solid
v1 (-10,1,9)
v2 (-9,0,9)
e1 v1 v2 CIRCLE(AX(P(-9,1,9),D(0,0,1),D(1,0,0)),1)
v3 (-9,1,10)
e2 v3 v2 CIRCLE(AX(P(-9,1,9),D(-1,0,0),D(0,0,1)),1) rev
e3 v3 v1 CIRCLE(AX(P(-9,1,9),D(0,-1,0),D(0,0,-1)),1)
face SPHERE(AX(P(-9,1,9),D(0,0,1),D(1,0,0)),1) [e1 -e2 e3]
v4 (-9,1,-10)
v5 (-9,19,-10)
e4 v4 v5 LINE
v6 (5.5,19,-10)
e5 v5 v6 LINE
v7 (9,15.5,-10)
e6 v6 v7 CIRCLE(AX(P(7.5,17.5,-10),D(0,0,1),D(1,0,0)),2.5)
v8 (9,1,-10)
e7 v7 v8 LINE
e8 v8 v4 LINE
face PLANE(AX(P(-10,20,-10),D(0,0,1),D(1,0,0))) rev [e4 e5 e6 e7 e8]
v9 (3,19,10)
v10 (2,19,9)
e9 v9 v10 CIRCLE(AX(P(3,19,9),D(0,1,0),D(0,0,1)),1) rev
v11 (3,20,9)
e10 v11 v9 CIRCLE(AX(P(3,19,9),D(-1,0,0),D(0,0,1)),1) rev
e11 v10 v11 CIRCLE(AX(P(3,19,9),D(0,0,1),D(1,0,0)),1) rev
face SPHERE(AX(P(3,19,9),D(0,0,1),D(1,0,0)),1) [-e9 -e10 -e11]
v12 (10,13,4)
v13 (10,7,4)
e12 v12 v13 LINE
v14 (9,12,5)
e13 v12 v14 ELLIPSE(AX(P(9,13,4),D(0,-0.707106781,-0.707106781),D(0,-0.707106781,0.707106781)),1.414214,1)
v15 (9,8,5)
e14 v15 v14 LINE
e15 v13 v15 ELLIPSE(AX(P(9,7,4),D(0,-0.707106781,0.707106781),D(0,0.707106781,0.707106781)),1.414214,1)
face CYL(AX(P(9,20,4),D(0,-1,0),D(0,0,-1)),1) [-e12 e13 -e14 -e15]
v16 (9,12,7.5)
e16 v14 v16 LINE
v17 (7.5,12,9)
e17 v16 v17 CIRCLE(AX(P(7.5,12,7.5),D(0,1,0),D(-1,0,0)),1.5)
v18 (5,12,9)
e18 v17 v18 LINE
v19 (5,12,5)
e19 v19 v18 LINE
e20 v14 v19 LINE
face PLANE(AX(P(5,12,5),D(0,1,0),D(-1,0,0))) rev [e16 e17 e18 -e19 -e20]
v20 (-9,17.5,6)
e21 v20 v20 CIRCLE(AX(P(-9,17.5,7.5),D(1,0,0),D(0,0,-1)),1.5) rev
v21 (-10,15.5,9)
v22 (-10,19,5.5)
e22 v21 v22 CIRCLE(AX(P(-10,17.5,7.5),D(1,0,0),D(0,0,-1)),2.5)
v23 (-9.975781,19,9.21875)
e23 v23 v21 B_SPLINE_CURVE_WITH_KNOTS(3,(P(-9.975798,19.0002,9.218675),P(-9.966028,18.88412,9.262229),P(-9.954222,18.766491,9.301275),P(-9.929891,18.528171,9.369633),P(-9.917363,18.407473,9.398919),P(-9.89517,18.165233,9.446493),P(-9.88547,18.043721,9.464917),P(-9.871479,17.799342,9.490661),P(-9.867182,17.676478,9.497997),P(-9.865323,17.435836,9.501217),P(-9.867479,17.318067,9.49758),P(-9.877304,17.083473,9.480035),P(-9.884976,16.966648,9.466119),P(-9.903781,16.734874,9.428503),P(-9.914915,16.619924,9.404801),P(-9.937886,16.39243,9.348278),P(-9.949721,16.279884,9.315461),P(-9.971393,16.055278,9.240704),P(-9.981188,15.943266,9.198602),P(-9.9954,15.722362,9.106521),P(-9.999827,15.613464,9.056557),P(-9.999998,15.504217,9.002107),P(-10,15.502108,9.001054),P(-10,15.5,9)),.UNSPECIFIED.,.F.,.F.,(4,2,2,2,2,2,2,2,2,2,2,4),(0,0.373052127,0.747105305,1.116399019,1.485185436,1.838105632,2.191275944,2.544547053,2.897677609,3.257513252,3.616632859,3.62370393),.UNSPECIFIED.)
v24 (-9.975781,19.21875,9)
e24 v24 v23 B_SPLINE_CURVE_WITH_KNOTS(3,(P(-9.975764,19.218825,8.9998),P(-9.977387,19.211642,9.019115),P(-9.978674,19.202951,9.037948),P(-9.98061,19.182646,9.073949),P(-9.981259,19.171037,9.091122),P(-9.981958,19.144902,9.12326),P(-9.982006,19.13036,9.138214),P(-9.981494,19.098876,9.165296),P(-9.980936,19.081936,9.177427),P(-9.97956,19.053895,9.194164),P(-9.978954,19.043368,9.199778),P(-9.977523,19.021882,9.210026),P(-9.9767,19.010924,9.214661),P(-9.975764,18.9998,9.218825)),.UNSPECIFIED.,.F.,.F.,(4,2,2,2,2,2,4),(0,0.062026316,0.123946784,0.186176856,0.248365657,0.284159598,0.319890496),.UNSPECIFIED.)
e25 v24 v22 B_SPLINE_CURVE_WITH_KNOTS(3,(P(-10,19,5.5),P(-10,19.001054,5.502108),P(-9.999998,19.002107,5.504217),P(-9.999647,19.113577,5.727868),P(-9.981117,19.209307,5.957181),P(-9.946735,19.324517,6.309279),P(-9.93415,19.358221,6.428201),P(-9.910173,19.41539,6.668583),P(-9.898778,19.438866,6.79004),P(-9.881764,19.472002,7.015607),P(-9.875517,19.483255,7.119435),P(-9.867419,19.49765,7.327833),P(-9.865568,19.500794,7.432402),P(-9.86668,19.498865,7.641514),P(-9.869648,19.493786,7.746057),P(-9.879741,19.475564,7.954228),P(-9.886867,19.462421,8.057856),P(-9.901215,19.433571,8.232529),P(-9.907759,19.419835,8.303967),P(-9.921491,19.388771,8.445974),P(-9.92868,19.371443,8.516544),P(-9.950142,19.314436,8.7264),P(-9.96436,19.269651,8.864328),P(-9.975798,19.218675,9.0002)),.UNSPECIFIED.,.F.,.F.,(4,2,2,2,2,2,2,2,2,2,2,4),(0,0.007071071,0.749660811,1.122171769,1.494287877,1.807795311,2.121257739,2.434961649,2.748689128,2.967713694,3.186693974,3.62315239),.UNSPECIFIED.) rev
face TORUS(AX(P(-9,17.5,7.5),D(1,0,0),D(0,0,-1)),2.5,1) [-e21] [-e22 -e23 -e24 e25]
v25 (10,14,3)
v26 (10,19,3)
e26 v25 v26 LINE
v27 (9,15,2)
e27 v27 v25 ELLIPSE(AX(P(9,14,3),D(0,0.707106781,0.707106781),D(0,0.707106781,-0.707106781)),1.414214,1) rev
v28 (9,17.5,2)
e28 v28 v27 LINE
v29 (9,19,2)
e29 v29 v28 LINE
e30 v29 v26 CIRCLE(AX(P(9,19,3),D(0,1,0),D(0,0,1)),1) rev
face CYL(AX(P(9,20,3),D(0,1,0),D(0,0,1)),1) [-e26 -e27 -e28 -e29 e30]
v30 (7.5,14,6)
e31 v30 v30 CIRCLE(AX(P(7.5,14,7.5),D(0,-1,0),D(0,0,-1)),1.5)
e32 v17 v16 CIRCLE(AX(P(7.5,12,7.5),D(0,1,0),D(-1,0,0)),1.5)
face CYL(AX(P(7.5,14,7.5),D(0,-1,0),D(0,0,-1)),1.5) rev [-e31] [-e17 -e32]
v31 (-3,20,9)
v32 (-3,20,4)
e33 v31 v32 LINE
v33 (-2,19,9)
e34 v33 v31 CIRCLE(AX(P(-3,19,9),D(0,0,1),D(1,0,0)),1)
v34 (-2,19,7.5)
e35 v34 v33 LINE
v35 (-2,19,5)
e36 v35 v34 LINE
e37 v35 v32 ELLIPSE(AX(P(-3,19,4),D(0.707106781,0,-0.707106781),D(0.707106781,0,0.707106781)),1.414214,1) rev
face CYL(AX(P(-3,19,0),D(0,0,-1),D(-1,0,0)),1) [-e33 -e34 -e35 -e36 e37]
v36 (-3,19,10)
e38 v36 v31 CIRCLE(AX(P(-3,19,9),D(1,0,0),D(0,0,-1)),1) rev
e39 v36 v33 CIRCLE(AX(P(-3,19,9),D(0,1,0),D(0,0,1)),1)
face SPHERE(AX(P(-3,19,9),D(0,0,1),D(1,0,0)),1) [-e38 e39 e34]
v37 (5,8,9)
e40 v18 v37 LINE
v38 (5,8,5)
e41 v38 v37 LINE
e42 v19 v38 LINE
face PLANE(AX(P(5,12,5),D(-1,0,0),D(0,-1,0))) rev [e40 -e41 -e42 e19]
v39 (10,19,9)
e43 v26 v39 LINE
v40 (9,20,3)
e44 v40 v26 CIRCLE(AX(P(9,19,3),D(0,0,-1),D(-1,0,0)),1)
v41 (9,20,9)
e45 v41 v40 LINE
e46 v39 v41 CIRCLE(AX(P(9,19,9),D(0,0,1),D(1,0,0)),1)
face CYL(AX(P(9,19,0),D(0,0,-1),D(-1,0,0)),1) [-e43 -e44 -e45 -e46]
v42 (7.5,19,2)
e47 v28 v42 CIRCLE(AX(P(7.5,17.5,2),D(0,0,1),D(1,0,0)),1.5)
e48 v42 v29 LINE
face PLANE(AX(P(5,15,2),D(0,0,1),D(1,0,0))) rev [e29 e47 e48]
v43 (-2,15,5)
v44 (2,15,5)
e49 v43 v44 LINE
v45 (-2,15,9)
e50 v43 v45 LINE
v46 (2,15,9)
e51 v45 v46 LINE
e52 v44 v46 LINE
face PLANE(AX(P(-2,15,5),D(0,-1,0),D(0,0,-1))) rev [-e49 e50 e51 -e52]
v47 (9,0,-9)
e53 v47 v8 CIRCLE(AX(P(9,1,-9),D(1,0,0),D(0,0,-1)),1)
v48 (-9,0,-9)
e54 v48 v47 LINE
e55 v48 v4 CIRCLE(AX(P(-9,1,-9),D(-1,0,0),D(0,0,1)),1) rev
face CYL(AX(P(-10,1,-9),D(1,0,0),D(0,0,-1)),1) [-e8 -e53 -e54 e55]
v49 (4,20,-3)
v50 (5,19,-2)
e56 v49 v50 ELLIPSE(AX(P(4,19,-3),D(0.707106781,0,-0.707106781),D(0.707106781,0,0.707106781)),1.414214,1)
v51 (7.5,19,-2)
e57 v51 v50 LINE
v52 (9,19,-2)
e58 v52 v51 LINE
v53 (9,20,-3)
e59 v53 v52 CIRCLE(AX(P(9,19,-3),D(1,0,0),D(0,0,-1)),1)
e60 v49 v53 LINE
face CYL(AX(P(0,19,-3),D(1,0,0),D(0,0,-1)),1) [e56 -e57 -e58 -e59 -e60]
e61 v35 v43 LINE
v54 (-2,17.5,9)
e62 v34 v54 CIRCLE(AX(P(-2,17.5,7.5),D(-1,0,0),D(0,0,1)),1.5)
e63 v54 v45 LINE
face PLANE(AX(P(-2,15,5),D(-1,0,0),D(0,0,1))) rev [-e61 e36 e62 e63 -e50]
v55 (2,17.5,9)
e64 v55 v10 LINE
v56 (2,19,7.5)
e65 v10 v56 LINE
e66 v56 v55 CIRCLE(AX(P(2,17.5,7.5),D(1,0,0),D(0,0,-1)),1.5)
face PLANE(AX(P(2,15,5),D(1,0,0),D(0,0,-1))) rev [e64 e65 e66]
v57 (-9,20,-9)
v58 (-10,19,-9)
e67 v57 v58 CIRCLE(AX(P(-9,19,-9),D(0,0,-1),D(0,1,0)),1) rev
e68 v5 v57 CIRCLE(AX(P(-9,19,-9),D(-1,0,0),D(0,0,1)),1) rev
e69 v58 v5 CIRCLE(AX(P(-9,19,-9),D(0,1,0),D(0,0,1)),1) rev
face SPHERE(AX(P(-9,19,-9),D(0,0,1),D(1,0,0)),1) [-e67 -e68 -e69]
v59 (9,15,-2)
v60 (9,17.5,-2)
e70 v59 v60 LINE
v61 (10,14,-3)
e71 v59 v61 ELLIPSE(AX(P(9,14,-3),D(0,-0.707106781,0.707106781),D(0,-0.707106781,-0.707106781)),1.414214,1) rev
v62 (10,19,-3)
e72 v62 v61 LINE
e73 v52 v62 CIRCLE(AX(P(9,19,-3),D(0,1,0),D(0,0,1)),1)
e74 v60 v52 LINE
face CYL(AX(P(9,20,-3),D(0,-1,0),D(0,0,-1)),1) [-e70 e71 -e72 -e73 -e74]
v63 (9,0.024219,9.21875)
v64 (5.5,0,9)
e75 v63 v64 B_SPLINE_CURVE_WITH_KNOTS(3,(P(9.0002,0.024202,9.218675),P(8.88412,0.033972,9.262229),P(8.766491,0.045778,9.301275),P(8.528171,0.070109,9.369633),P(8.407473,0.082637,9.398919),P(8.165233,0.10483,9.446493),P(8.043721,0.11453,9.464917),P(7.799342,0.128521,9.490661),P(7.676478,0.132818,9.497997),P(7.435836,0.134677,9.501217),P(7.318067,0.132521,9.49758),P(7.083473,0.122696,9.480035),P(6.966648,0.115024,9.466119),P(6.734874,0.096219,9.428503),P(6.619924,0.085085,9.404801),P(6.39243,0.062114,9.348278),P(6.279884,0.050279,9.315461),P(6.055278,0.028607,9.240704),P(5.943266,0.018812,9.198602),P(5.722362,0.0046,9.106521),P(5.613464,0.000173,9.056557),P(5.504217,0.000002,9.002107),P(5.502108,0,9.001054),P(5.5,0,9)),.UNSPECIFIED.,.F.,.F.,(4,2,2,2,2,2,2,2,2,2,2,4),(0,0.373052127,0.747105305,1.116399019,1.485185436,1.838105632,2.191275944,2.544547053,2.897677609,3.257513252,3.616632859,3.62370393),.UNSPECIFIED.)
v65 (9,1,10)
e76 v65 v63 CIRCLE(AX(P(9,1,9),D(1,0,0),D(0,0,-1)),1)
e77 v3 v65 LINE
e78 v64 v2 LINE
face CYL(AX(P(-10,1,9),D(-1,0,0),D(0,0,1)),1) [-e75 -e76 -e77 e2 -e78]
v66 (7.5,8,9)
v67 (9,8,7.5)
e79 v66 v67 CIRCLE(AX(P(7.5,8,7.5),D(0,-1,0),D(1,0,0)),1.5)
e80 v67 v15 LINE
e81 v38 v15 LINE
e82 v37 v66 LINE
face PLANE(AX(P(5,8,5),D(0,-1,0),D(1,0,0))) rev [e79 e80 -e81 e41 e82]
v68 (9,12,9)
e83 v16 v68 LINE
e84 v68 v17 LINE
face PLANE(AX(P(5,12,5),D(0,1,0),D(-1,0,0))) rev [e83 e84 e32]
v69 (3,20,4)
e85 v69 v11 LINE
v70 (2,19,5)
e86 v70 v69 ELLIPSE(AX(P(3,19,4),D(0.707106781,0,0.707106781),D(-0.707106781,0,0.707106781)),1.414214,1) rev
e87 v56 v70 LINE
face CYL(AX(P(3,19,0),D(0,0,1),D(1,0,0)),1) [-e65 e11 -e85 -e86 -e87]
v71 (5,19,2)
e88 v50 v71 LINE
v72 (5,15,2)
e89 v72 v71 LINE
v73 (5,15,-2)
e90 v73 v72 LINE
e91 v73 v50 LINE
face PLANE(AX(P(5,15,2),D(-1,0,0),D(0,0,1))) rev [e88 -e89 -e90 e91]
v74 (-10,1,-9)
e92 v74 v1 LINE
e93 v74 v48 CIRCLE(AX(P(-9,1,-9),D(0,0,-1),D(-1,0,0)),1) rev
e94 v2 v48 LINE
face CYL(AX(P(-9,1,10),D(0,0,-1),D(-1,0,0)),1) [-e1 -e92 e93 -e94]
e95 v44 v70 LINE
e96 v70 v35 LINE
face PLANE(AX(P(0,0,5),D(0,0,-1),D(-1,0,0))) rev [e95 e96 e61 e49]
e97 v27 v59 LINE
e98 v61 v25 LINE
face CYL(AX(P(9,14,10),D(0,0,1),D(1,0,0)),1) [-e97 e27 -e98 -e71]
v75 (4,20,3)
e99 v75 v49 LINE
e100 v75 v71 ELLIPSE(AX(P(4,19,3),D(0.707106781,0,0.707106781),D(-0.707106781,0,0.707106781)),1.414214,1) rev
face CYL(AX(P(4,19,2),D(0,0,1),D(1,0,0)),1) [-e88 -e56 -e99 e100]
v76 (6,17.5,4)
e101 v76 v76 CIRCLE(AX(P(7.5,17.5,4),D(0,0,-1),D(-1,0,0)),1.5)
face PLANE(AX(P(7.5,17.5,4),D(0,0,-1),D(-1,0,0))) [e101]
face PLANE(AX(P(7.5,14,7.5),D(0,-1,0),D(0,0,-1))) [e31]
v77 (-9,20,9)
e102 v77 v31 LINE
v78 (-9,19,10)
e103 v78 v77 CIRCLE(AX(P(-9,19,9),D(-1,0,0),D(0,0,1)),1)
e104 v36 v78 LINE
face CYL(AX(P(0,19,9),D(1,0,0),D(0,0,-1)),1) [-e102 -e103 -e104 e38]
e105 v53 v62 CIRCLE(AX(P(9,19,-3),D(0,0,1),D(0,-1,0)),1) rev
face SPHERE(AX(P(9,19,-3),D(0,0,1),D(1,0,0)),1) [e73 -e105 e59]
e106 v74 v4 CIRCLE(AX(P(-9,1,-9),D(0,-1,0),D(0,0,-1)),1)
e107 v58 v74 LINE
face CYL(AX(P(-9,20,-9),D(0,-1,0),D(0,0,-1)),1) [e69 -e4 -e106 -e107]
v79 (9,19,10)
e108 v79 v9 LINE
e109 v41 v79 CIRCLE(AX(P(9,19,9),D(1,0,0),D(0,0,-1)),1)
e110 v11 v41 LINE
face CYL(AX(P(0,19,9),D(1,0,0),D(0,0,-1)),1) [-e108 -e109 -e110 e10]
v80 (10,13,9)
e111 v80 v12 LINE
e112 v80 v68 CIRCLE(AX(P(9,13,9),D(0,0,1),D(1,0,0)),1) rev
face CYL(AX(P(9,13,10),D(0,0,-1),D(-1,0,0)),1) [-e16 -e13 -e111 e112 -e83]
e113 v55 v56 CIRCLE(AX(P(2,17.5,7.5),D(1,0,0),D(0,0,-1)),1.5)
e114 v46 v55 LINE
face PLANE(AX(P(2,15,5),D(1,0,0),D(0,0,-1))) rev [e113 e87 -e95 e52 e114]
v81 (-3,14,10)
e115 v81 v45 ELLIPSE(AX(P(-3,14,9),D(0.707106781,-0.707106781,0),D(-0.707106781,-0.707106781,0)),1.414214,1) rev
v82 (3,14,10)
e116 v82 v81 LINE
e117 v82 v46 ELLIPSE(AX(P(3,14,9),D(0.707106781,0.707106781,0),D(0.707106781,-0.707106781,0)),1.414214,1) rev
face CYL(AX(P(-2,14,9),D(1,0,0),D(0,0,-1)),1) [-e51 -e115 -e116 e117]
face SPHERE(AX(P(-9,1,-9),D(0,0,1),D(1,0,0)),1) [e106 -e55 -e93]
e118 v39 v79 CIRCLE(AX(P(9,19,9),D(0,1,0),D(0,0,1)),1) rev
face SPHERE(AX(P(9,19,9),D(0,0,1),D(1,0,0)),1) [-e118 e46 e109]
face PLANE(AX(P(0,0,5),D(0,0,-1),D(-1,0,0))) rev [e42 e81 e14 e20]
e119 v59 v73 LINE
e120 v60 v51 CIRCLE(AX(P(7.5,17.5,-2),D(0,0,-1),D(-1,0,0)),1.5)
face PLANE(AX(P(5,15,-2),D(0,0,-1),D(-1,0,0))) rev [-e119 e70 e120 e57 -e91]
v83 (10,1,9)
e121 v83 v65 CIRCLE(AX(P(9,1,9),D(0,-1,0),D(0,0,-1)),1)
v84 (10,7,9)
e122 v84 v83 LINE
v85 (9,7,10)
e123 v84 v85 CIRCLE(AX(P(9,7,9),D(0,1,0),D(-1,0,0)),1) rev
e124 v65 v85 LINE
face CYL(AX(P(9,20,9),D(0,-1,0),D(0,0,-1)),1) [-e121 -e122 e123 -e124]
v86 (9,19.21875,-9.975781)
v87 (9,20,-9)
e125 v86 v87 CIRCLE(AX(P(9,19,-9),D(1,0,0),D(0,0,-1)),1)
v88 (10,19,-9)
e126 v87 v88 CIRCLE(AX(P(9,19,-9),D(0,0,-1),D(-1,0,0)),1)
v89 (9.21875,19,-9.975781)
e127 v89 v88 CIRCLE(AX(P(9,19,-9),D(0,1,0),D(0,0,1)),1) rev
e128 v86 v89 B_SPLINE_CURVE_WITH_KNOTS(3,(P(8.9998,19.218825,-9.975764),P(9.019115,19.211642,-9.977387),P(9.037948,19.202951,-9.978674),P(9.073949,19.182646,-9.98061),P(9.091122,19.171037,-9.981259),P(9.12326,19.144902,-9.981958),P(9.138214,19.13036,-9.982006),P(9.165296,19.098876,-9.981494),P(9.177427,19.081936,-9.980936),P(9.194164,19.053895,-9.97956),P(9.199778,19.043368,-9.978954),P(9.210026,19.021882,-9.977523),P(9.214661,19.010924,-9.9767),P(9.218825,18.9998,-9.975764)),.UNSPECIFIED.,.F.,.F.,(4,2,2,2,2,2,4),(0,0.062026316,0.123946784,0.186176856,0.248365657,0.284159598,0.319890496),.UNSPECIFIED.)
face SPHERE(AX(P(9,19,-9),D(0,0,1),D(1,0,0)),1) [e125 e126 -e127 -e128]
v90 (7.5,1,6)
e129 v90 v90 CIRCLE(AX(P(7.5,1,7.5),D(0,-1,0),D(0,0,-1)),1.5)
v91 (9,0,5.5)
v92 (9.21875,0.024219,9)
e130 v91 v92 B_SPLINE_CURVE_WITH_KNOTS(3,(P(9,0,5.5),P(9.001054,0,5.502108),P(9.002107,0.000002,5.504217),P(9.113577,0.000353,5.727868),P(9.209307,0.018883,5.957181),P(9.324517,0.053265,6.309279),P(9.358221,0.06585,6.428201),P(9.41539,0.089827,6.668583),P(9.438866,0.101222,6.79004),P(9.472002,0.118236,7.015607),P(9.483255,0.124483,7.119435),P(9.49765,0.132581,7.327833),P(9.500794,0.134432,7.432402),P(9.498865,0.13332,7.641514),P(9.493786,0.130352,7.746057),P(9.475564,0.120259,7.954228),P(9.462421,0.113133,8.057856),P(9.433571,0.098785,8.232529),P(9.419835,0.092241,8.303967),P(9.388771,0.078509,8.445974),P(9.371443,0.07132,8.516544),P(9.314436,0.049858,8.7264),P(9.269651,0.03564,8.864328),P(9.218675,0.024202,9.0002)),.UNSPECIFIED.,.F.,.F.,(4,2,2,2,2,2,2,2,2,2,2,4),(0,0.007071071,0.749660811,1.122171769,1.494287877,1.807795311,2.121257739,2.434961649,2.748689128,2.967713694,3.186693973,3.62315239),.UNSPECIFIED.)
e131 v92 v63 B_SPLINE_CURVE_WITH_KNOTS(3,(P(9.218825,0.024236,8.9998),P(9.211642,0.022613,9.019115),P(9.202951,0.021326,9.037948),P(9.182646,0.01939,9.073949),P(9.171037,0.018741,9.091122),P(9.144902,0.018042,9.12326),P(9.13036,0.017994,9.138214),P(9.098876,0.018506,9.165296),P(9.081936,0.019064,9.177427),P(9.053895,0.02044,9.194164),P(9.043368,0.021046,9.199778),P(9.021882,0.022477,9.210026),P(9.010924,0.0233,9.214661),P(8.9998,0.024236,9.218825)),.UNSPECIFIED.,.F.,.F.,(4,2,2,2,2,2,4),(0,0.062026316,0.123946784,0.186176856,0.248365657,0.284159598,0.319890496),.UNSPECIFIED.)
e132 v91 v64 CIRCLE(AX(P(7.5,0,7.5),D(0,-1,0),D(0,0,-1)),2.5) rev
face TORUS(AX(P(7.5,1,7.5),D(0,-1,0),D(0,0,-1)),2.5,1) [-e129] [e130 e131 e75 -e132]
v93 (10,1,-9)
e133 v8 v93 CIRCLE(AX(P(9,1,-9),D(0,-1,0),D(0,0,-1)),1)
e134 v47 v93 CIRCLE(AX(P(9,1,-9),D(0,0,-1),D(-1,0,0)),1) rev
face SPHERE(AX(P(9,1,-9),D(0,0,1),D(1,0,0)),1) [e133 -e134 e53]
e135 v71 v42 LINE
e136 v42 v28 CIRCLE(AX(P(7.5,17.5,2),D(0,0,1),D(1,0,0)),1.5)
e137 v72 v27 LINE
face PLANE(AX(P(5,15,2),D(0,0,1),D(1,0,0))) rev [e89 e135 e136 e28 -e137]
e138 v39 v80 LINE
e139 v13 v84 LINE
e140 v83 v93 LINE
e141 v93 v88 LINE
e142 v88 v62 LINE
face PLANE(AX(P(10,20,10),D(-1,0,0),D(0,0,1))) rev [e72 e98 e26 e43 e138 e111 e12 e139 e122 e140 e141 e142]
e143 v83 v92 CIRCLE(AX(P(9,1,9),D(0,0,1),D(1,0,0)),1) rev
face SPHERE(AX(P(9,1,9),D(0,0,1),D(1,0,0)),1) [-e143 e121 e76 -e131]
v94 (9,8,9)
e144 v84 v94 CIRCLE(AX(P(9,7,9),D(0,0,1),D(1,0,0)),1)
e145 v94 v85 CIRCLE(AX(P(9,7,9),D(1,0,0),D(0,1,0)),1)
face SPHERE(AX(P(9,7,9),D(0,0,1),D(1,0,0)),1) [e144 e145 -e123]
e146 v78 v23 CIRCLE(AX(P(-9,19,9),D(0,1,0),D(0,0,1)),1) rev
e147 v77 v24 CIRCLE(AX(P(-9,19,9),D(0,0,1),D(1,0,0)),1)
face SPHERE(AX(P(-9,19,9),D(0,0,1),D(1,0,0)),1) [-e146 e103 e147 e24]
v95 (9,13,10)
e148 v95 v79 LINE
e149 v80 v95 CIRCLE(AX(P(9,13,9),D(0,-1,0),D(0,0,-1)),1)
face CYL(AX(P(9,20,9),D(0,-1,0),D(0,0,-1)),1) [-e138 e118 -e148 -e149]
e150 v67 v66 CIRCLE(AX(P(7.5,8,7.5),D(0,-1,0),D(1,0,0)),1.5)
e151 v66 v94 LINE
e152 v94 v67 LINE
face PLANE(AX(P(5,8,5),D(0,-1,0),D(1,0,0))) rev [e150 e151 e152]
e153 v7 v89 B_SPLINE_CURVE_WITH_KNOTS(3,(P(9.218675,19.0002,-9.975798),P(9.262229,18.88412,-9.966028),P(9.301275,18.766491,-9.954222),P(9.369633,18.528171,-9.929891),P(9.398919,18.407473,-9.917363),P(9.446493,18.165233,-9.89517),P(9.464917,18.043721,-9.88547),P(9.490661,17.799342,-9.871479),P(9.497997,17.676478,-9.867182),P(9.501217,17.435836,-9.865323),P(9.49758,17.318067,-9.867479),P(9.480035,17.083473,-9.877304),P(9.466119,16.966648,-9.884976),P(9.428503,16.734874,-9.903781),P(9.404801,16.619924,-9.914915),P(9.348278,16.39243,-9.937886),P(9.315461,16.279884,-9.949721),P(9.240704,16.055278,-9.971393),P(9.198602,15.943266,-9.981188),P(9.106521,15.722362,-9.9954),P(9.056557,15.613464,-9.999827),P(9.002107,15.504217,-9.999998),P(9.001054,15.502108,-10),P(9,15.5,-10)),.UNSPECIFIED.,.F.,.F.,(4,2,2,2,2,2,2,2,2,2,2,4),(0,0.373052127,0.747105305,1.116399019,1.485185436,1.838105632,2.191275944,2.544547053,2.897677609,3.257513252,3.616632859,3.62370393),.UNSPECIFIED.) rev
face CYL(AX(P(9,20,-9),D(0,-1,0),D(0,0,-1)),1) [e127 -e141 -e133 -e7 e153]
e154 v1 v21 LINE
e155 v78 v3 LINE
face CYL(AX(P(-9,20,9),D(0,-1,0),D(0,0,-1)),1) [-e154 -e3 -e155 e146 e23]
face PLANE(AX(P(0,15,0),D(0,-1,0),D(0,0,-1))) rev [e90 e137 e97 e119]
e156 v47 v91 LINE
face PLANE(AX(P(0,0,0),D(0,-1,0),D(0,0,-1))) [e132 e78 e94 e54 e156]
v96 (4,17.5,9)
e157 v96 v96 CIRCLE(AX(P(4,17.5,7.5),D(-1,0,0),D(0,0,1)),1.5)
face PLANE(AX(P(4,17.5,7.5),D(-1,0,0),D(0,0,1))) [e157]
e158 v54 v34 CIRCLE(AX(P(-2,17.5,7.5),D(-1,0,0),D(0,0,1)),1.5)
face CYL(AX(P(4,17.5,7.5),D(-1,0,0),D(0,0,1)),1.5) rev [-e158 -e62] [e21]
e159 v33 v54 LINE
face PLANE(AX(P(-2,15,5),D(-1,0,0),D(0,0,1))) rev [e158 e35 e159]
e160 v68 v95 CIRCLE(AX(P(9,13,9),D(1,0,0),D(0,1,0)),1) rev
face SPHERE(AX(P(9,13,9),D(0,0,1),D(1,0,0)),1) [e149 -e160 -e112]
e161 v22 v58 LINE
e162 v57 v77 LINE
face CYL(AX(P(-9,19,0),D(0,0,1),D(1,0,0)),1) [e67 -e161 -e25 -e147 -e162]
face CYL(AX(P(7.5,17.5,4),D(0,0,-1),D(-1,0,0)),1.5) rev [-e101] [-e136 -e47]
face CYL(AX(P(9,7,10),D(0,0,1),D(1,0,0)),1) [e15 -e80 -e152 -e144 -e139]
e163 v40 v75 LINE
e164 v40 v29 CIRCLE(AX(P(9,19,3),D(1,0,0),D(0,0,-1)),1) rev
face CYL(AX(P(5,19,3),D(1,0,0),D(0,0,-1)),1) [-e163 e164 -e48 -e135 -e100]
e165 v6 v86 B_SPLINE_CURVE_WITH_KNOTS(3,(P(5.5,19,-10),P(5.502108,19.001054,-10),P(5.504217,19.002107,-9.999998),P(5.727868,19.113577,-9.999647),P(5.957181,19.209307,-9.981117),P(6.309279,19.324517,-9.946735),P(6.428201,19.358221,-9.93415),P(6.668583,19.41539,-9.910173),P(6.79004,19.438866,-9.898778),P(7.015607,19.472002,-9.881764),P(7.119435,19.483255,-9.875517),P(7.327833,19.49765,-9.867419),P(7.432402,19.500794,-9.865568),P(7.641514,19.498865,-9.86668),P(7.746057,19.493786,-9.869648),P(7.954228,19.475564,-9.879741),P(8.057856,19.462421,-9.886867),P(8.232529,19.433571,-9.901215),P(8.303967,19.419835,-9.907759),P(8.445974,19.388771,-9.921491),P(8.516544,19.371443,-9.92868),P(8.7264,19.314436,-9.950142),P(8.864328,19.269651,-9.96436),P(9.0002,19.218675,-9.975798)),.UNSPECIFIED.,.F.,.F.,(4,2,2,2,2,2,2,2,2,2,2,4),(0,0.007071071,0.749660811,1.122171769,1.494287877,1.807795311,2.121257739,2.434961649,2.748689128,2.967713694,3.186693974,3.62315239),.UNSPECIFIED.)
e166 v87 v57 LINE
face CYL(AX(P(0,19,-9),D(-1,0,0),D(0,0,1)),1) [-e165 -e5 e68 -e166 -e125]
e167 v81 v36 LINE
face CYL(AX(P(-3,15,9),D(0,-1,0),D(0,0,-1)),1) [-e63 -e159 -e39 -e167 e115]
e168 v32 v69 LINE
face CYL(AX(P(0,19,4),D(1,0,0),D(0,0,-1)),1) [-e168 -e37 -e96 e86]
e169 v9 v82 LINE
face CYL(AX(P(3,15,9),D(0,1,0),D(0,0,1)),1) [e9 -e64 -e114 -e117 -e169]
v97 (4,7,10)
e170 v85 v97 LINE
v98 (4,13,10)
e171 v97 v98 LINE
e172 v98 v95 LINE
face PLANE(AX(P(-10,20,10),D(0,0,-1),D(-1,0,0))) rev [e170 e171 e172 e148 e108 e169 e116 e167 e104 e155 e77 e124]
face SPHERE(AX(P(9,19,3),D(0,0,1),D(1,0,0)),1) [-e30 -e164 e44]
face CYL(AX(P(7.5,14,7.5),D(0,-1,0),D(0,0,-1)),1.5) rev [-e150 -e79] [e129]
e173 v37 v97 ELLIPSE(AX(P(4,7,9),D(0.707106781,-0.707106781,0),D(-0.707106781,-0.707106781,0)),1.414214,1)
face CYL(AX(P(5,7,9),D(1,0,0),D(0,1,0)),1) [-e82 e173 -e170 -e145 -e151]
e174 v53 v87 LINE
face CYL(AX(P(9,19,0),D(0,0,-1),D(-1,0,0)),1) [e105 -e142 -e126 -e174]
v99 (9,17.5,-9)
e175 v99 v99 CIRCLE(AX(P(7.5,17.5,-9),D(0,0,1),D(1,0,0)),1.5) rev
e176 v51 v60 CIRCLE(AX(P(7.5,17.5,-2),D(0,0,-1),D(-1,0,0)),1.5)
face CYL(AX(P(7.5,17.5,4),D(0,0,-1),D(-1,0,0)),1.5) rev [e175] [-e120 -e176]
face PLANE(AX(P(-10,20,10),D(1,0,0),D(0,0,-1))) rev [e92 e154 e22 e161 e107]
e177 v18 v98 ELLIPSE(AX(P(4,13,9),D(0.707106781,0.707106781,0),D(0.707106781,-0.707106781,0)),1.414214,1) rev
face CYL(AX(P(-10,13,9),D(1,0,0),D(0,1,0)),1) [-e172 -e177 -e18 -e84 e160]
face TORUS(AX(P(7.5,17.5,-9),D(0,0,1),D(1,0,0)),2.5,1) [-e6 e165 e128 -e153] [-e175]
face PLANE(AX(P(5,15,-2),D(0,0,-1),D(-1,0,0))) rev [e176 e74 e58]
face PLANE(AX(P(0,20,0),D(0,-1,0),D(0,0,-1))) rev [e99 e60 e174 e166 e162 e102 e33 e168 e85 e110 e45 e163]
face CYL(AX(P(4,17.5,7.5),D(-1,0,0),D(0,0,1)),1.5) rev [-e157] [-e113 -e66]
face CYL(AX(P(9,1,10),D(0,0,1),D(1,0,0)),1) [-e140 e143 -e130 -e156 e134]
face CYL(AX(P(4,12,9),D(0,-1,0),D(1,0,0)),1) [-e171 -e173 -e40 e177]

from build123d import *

# Parameters (mm, degrees)
SKETCH1_W           = 20
SKETCH1_H           = 20
BOSS_EXTRUDE1_DEPTH = 20
SKETCH2_W           = 4
SKETCH2_H           = 10
SKETCH2_W_2         = 10
SKETCH2_H_2         = 4
CUT_EXTRUDE1_DEPTH  = 5
SKETCH3_W           = 10
SKETCH3_H           = 4
CUT_EXTRUDE2_DEPTH  = 5
SKETCH4_R           = 1.5
CUT_EXTRUDE3_DEPTH  = 14
SKETCH5_R           = 1.5
CUT_EXTRUDE4_DEPTH  = 14
SKETCH6_R           = 1.5
CUT_EXTRUDE5_DEPTH  = 14
FILLET4_R           = 1


with BuildPart() as part:
    # Sketch1 → Boss-Extrude1 (new body)
    with BuildSketch(Plane(origin=(0, 0, 0), x_dir=(1, 0, 0), z_dir=(0, 1, 0))):
        Rectangle(SKETCH1_W, SKETCH1_H)
    extrude(amount=BOSS_EXTRUDE1_DEPTH)

    # Sketch2 → Cut-Extrude1 (cut)
    with BuildSketch(Plane.XY.offset(10)):
        with Locations((0, 20)):
            Rectangle(SKETCH2_W, SKETCH2_H)
        with Locations((10, 10)):
            Rectangle(SKETCH2_W_2, SKETCH2_H_2)
    extrude(amount=-CUT_EXTRUDE1_DEPTH, mode=Mode.SUBTRACT)

    # Sketch3 → Cut-Extrude2 (cut)
    with BuildSketch(Plane(origin=(0, 20, 0), x_dir=(1, 0, 0), z_dir=(0, 1, 0))):
        with Locations((10, 0)):
            Rectangle(SKETCH3_W, SKETCH3_H)
    extrude(amount=-CUT_EXTRUDE2_DEPTH, mode=Mode.SUBTRACT)

    # Sketch4 → Cut-Extrude3 (cut)
    with BuildSketch(Plane.ZY.offset(10)):
        with Locations((7.5, 17.5)):
            Circle(SKETCH4_R)
    extrude(amount=-CUT_EXTRUDE3_DEPTH, mode=Mode.SUBTRACT)

    # Sketch5 → Cut-Extrude4 (cut)
    with BuildSketch(Plane(origin=(0, 0, -10), x_dir=(-1, 0, 0), z_dir=(0, 0, -1))):
        with Locations((-7.5, 17.5)):
            Circle(SKETCH5_R)
    extrude(amount=-CUT_EXTRUDE4_DEPTH, mode=Mode.SUBTRACT)

    # Sketch6 → Cut-Extrude5 (cut)
    with BuildSketch(Plane.XZ):
        with Locations(Location((7.5, 7.5, 0), (0, 0, 270))):
            Circle(SKETCH6_R)
    extrude(amount=-CUT_EXTRUDE5_DEPTH, mode=Mode.SUBTRACT)

    # Fillet4
    # the kernel refuses this fillet: 1 mm, written as the material it takes off along each edge
    with BuildSketch(Plane(origin=(-9, 19, -9), x_dir=(0, 0, -1), z_dir=(-1, 0, 0))) as fillet4_piece_1_section:
        Polygon((0, 0), (FILLET4_R, 0), (FILLET4_R, -FILLET4_R), (0, -FILLET4_R), align=None)
    fillet4_piece_1 = extrude(amount=FILLET4_R, mode=Mode.PRIVATE)
    fillet4_piece_1 = fillet4_piece_1 - Plane(origin=(-9, 19, -9), x_dir=(0, -0.7071067811865475, 0.7071067811865475), z_dir=(-1, 0, 0)) * Sphere(FILLET4_R, mode=Mode.PRIVATE)
    add(fillet4_piece_1, mode=Mode.SUBTRACT)
    with BuildSketch(Plane(origin=(-9, 19, 9), x_dir=(-1, 0, 0), z_dir=(0, 0, 1))) as fillet4_piece_2_section:
        Polygon((0, 0), (FILLET4_R, 0), (FILLET4_R, -FILLET4_R), (0, -FILLET4_R), align=None)
    fillet4_piece_2 = extrude(amount=FILLET4_R, mode=Mode.PRIVATE)
    fillet4_piece_2 = fillet4_piece_2 - Plane(origin=(-9, 19, 9), x_dir=(0.7071067811865475, -0.7071067811865475, 0), z_dir=(0, 0, 1)) * Sphere(FILLET4_R, mode=Mode.PRIVATE)
    add(fillet4_piece_2, mode=Mode.SUBTRACT)
    with BuildSketch(Plane(origin=(-3, 19, 9), x_dir=(1, 0, 0), z_dir=(0, 0, 1))) as fillet4_piece_3_section:
        Polygon((0, 0), (FILLET4_R, 0), (FILLET4_R, FILLET4_R), (0, FILLET4_R), align=None)
    fillet4_piece_3 = extrude(amount=FILLET4_R, mode=Mode.PRIVATE)
    fillet4_piece_3 = fillet4_piece_3 - Plane(origin=(-3, 19, 9), x_dir=(-0.7071067811865475, -0.7071067811865475, 0), z_dir=(0, 0, 1)) * Sphere(FILLET4_R, mode=Mode.PRIVATE)
    add(fillet4_piece_3, mode=Mode.SUBTRACT)
    with BuildSketch(Plane(origin=(9, 1, 9), x_dir=(0, -1, 0), z_dir=(0, 0, 1))) as fillet4_piece_4_section:
        Polygon((0, 0), (FILLET4_R, 0), (FILLET4_R, FILLET4_R), (0, FILLET4_R), align=None)
    fillet4_piece_4 = extrude(amount=FILLET4_R, mode=Mode.PRIVATE)
    fillet4_piece_4 = fillet4_piece_4 - Plane(origin=(9, 1, 9), x_dir=(-0.7071067811865475, 0.7071067811865475, 0), z_dir=(0, 0, 1)) * Sphere(FILLET4_R, mode=Mode.PRIVATE)
    add(fillet4_piece_4, mode=Mode.SUBTRACT)
    with BuildSketch(Plane(origin=(9, 7, 9), x_dir=(1, 0, 0), z_dir=(0, 0, 1))) as fillet4_piece_5_section:
        Polygon((0, 0), (FILLET4_R, 0), (FILLET4_R, FILLET4_R), (0, FILLET4_R), align=None)
    fillet4_piece_5 = extrude(amount=FILLET4_R, mode=Mode.PRIVATE)
    fillet4_piece_5 = fillet4_piece_5 - Plane(origin=(9, 7, 9), x_dir=(-0.7071067811865488, -0.7071067811865461, 0), z_dir=(0, 0, 1)) * Sphere(FILLET4_R, mode=Mode.PRIVATE)
    add(fillet4_piece_5, mode=Mode.SUBTRACT)
    with BuildSketch(Plane(origin=(9, 13, 9), x_dir=(1, 0, 0), z_dir=(0, 0, 1))) as fillet4_piece_6_section:
        Polygon((0, 0), (FILLET4_R, 0), (FILLET4_R, -FILLET4_R), (0, -FILLET4_R), align=None)
    fillet4_piece_6 = extrude(amount=FILLET4_R, mode=Mode.PRIVATE)
    fillet4_piece_6 = fillet4_piece_6 - Plane(origin=(9, 13, 9), x_dir=(-0.7071067811865461, 0.7071067811865488, 0), z_dir=(0, 0, 1)) * Sphere(FILLET4_R, mode=Mode.PRIVATE)
    add(fillet4_piece_6, mode=Mode.SUBTRACT)
    with BuildSketch(Plane(origin=(3, 19, 9), x_dir=(0, 1, 0), z_dir=(0, 0, 1))) as fillet4_piece_7_section:
        Polygon((0, 0), (FILLET4_R, 0), (FILLET4_R, FILLET4_R), (0, FILLET4_R), align=None)
    fillet4_piece_7 = extrude(amount=FILLET4_R, mode=Mode.PRIVATE)
    fillet4_piece_7 = fillet4_piece_7 - Plane(origin=(3, 19, 9), x_dir=(0.7071067811865475, -0.7071067811865475, 0), z_dir=(0, 0, 1)) * Sphere(FILLET4_R, mode=Mode.PRIVATE)
    add(fillet4_piece_7, mode=Mode.SUBTRACT)
    with BuildSketch(Plane(origin=(9, 19, 9), x_dir=(1, 0, 0), z_dir=(0, 0, 1))) as fillet4_piece_8_section:
        Polygon((0, 0), (FILLET4_R, 0), (FILLET4_R, FILLET4_R), (0, FILLET4_R), align=None)
    fillet4_piece_8 = extrude(amount=FILLET4_R, mode=Mode.PRIVATE)
    fillet4_piece_8 = fillet4_piece_8 - Plane(origin=(9, 19, 9), x_dir=(-0.7071067811865475, -0.7071067811865475, 0), z_dir=(0, 0, 1)) * Sphere(FILLET4_R, mode=Mode.PRIVATE)
    add(fillet4_piece_8, mode=Mode.SUBTRACT)
    with BuildSketch(Plane(origin=(9, 19, 3), x_dir=(0, 1, 0), z_dir=(1, 0, 0))) as fillet4_piece_9_section:
        Polygon((0, 0), (FILLET4_R, 0), (FILLET4_R, -FILLET4_R), (0, -FILLET4_R), align=None)
    fillet4_piece_9 = extrude(amount=FILLET4_R, mode=Mode.PRIVATE)
    fillet4_piece_9 = fillet4_piece_9 - Plane(origin=(9, 19, 3), x_dir=(0, -0.7071067811865475, 0.7071067811865475), z_dir=(1, 0, 0)) * Sphere(FILLET4_R, mode=Mode.PRIVATE)
    add(fillet4_piece_9, mode=Mode.SUBTRACT)
    with BuildSketch(Plane(origin=(-9, 1, 9), x_dir=(0, -1, 0), z_dir=(0, 0, 1))) as fillet4_piece_10_section:
        Polygon((0, 0), (FILLET4_R, 0), (FILLET4_R, -FILLET4_R), (0, -FILLET4_R), align=None)
    fillet4_piece_10 = extrude(amount=FILLET4_R, mode=Mode.PRIVATE)
    fillet4_piece_10 = fillet4_piece_10 - Plane(origin=(-9, 1, 9), x_dir=(0.7071067811865475, 0.7071067811865475, 0), z_dir=(0, 0, 1)) * Sphere(FILLET4_R, mode=Mode.PRIVATE)
    add(fillet4_piece_10, mode=Mode.SUBTRACT)
    with BuildSketch(Plane(origin=(-9, 1, -9), x_dir=(-1, 0, 0), z_dir=(0, -1, 0))) as fillet4_piece_11_section:
        Polygon((0, 0), (FILLET4_R, 0), (FILLET4_R, FILLET4_R), (0, FILLET4_R), align=None)
    fillet4_piece_11 = extrude(amount=FILLET4_R, mode=Mode.PRIVATE)
    fillet4_piece_11 = fillet4_piece_11 - Plane(origin=(-9, 1, -9), x_dir=(0.7071067811865475, 0, 0.7071067811865475), z_dir=(0, -1, 0)) * Sphere(FILLET4_R, mode=Mode.PRIVATE)
    add(fillet4_piece_11, mode=Mode.SUBTRACT)
    with BuildSketch(Plane(origin=(9, 19, -3), x_dir=(0, 0, 1), z_dir=(1, 0, 0))) as fillet4_piece_12_section:
        Polygon((0, 0), (FILLET4_R, 0), (FILLET4_R, -FILLET4_R), (0, -FILLET4_R), align=None)
    fillet4_piece_12 = extrude(amount=FILLET4_R, mode=Mode.PRIVATE)
    fillet4_piece_12 = fillet4_piece_12 - Plane(origin=(9, 19, -3), x_dir=(0, -0.7071067811865475, -0.7071067811865475), z_dir=(1, 0, 0)) * Sphere(FILLET4_R, mode=Mode.PRIVATE)
    add(fillet4_piece_12, mode=Mode.SUBTRACT)
    with BuildSketch(Plane(origin=(9, 19, -9), x_dir=(0, 0, -1), z_dir=(1, 0, 0))) as fillet4_piece_13_section:
        Polygon((0, 0), (FILLET4_R, 0), (FILLET4_R, FILLET4_R), (0, FILLET4_R), align=None)
    fillet4_piece_13 = extrude(amount=FILLET4_R, mode=Mode.PRIVATE)
    fillet4_piece_13 = fillet4_piece_13 - Plane(origin=(9, 19, -9), x_dir=(0, -0.7071067811865475, 0.7071067811865475), z_dir=(1, 0, 0)) * Sphere(FILLET4_R, mode=Mode.PRIVATE)
    add(fillet4_piece_13, mode=Mode.SUBTRACT)
    with BuildSketch(Plane(origin=(9, 1, -9), x_dir=(1, 0, 0), z_dir=(0, -1, 0))) as fillet4_piece_14_section:
        Polygon((0, 0), (FILLET4_R, 0), (FILLET4_R, -FILLET4_R), (0, -FILLET4_R), align=None)
    fillet4_piece_14 = extrude(amount=FILLET4_R, mode=Mode.PRIVATE)
    fillet4_piece_14 = fillet4_piece_14 - Plane(origin=(9, 1, -9), x_dir=(-0.7071067811865475, 0, 0.7071067811865475), z_dir=(0, -1, 0)) * Sphere(FILLET4_R, mode=Mode.PRIVATE)
    add(fillet4_piece_14, mode=Mode.SUBTRACT)
    with BuildSketch(Plane(origin=(-10, 20, -9), x_dir=(1, 0, 0), z_dir=(0, 0, 1)), Plane(origin=(-9, 0, 10), x_dir=(0, 1, 0), z_dir=(1, 0, 0)), Plane(origin=(9, 20, -10), x_dir=(0, 0, 1), z_dir=(-1, 0, 0)), Plane(origin=(10, 1, -10), x_dir=(0, 0, 1), z_dir=(0, 1, 0))) as fillet4_piece_15:
        with BuildLine():
            CenterArc((FILLET4_R, -FILLET4_R), FILLET4_R, 90, 90)
            Line((0, -FILLET4_R), (0, 0))
            Line((0, 0), (FILLET4_R, 0))
        make_face()
    extrude(amount=18, mode=Mode.SUBTRACT)
    with BuildSketch(Plane(origin=(-9, 20, 10), x_dir=(0, -1, 0), z_dir=(1, 0, 0)), Plane(origin=(3, 20, 10), x_dir=(0, -1, 0), z_dir=(1, 0, 0)), Plane(origin=(10, 20, 9), x_dir=(0, -1, 0), z_dir=(0, 0, -1)), Plane(origin=(10, 20, -3), x_dir=(0, -1, 0), z_dir=(0, 0, -1))) as fillet4_piece_16:
        with BuildLine():
            CenterArc((FILLET4_R, FILLET4_R), FILLET4_R, 180, 90)
            Line((0, FILLET4_R), (0, 0))
            Line((0, 0), (FILLET4_R, 0))
        make_face()
    extrude(amount=6, mode=Mode.SUBTRACT)
    with BuildSketch(Plane(origin=(10, 1, 10), x_dir=(-1, 0, 0), z_dir=(0, 1, 0)), Plane(origin=(10, 13, 10), x_dir=(-1, 0, 0), z_dir=(0, 1, 0))) as fillet4_piece_17:
        with BuildLine():
            CenterArc((FILLET4_R, -FILLET4_R), FILLET4_R, 90, 90)
            Line((0, -FILLET4_R), (0, 0))
            Line((0, 0), (FILLET4_R, 0))
        make_face()
    extrude(amount=6, mode=Mode.SUBTRACT)
    with BuildSketch(Plane(origin=(9, 12, 10), x_dir=(0, 1, 0), z_dir=(-1, 0, 0)), Plane(origin=(10, 8, 5), x_dir=(0, 0, -1), z_dir=(0, 1, 0)), Plane(origin=(5, 12, 10), x_dir=(-1, 0, 0), z_dir=(0, -1, 0)), Plane(origin=(5, 8, 10), x_dir=(0, -1, 0), z_dir=(1, 0, 0)), Plane(origin=(-2, 20, 5), x_dir=(-1, 0, 0), z_dir=(0, 0, 1)), Plane(origin=(2, 20, 9), x_dir=(1, 0, 0), z_dir=(0, 0, -1)), Plane(origin=(-2, 19, 10), x_dir=(-1, 0, 0), z_dir=(0, -1, 0)), Plane(origin=(-2, 15, 10), x_dir=(0, -1, 0), z_dir=(1, 0, 0)), Plane(origin=(2, 15, 10), x_dir=(1, 0, 0), z_dir=(0, 1, 0)), Plane(origin=(9, 20, -2), x_dir=(0, 0, -1), z_dir=(-1, 0, 0)), Plane(origin=(10, 15, 2), x_dir=(0, -1, 0), z_dir=(0, 0, -1)), Plane(origin=(5, 20, -2), x_dir=(-1, 0, 0), z_dir=(0, 0, 1)), Plane(origin=(5, 20, 2), x_dir=(0, 0, 1), z_dir=(1, 0, 0))) as fillet4_piece_18:
        with BuildLine():
            CenterArc((FILLET4_R, FILLET4_R), FILLET4_R, 180, 90)
            Line((0, FILLET4_R), (0, 0))
            Line((0, 0), (FILLET4_R, 0))
        make_face()
    extrude(amount=4, mode=Mode.SUBTRACT)
    with BuildSketch(Plane(origin=(10, 8, 5), x_dir=(0, -1, 0), z_dir=(0, 0, 1)), Plane(origin=(10, 12, 9), x_dir=(0, 1, 0), z_dir=(0, 0, -1)), Plane(origin=(-2, 20, 5), x_dir=(0, 0, -1), z_dir=(1, 0, 0)), Plane(origin=(10, 15, 2), x_dir=(0, 0, 1), z_dir=(0, 1, 0)), Plane(origin=(10, 19, -2), x_dir=(0, 0, -1), z_dir=(0, -1, 0))) as fillet4_piece_19:
        with BuildLine():
            CenterArc((FILLET4_R, -FILLET4_R), FILLET4_R, 90, 90)
            Line((0, -FILLET4_R), (0, 0))
            Line((0, 0), (FILLET4_R, 0))
        make_face()
    extrude(amount=4, mode=Mode.SUBTRACT)
    with BuildSketch(Plane(origin=(-10, 0, -9), x_dir=(1, 0, 0), z_dir=(0, 0, 1)), Plane(origin=(9, 0, -10), x_dir=(0, 0, 1), z_dir=(-1, 0, 0)), Plane(origin=(10, 0, 9), x_dir=(-1, 0, 0), z_dir=(0, 0, -1)), Plane(origin=(-10, 1, 10), x_dir=(1, 0, 0), z_dir=(0, 1, 0)), Plane(origin=(-10, 1, -10), x_dir=(0, 0, 1), z_dir=(0, 1, 0))) as fillet4_piece_20:
        with BuildLine():
            CenterArc((FILLET4_R, FILLET4_R), FILLET4_R, 180, 90)
            Line((0, FILLET4_R), (0, 0))
            Line((0, 0), (FILLET4_R, 0))
        make_face()
    extrude(amount=18, mode=Mode.SUBTRACT)
    with BuildSketch(Plane(origin=(-10, 17.5, 7.5), x_dir=(0, 0, 1), z_dir=(0, -1, 0))) as fillet4_piece_21:
        with BuildLine():
            CenterArc((1.5 + FILLET4_R, -FILLET4_R), FILLET4_R, 90, 90)
            Line((1.5, -FILLET4_R), (1.5, 0))
            Line((1.5, 0), (1.5 + FILLET4_R, 0))
        make_face()
    revolve(axis=Axis((-10, 17.5, 7.5), (-1, 0, 0)), mode=Mode.SUBTRACT)
    with BuildSketch(Plane(origin=(7.5, 17.5, -10), x_dir=(-1, 0, 0), z_dir=(0, -1, 0))) as fillet4_piece_22:
        with BuildLine():
            CenterArc((1.5 + FILLET4_R, -FILLET4_R), FILLET4_R, 90, 90)
            Line((1.5, -FILLET4_R), (1.5, 0))
            Line((1.5, 0), (1.5 + FILLET4_R, 0))
        make_face()
    revolve(axis=Axis((7.5, 17.5, -10), (0, 0, -1)), mode=Mode.SUBTRACT)
    with BuildSketch(Plane(origin=(7.5, 0, 7.5), x_dir=(0, 0, -1), z_dir=(-1, 0, 0))) as fillet4_piece_23:
        with BuildLine():
            CenterArc((1.5 + FILLET4_R, -FILLET4_R), FILLET4_R, 90, 90)
            Line((1.5, -FILLET4_R), (1.5, 0))
            Line((1.5, 0), (1.5 + FILLET4_R, 0))
        make_face()
    revolve(axis=Axis((7.5, 0, 7.5), (0, -1, 0)), mode=Mode.SUBTRACT)
    with BuildSketch(Plane(origin=(5, 14.5, 10), x_dir=(-1, 0, 0), z_dir=(0, -1, 0))) as fillet4_piece_24a_section:
        with BuildLine():
            CenterArc((FILLET4_R, FILLET4_R), FILLET4_R, 180, 90)
            Line((0, FILLET4_R), (0, 0))
            Line((0, 0), (FILLET4_R, 0))
        make_face()
    fillet4_piece_24a = extrude(amount=6.5, mode=Mode.PRIVATE)
    fillet4_piece_24a = split(fillet4_piece_24a, bisect_by=Plane(origin=(4.773604886, 12, 9.773604886), z_dir=(0, 1, 0)), keep=Keep.TOP, mode=Mode.PRIVATE)
    with BuildSketch(Plane(origin=(9, 12, 10), x_dir=(0, 1, 0), z_dir=(-1, 0, 0))) as fillet4_piece_24b_section:
        with BuildLine():
            CenterArc((FILLET4_R, FILLET4_R), FILLET4_R, 180, 90)
            Line((0, FILLET4_R), (0, 0))
            Line((0, 0), (FILLET4_R, 0))
        make_face()
    fillet4_piece_24b = extrude(amount=6.5, mode=Mode.PRIVATE)
    fillet4_piece_24b = split(fillet4_piece_24b, bisect_by=Plane(origin=(5, 12.226395114, 9.773604886), z_dir=(-1, 0, 0)), keep=Keep.TOP, mode=Mode.PRIVATE)
    fillet4_piece_24 = fillet4_piece_24a & fillet4_piece_24b
    add(fillet4_piece_24, mode=Mode.SUBTRACT)
    with BuildSketch(Plane(origin=(10, 5.5, 5), x_dir=(0, 0, -1), z_dir=(0, 1, 0))) as fillet4_piece_25a_section:
        with BuildLine():
            CenterArc((FILLET4_R, FILLET4_R), FILLET4_R, 180, 90)
            Line((0, FILLET4_R), (0, 0))
            Line((0, 0), (FILLET4_R, 0))
        make_face()
    fillet4_piece_25a = extrude(amount=6.5, mode=Mode.PRIVATE)
    fillet4_piece_25a = split(fillet4_piece_25a, bisect_by=Plane(origin=(9.773604886, 8, 4.773604886), z_dir=(0, -1, 0)), keep=Keep.TOP, mode=Mode.PRIVATE)
    with BuildSketch(Plane(origin=(10, 8, 2.5), x_dir=(0, -1, 0), z_dir=(0, 0, 1))) as fillet4_piece_25b_section:
        with BuildLine():
            CenterArc((FILLET4_R, -FILLET4_R), FILLET4_R, 90, 90)
            Line((0, -FILLET4_R), (0, 0))
            Line((0, 0), (FILLET4_R, 0))
        make_face()
    fillet4_piece_25b = extrude(amount=6.5, mode=Mode.PRIVATE)
    fillet4_piece_25b = split(fillet4_piece_25b, bisect_by=Plane(origin=(9.773604886, 7.773604886, 5), z_dir=(0, 0, -1)), keep=Keep.TOP, mode=Mode.PRIVATE)
    fillet4_piece_25 = fillet4_piece_25a & fillet4_piece_25b
    add(fillet4_piece_25, mode=Mode.SUBTRACT)
    with BuildSketch(Plane(origin=(10, 12, 9), x_dir=(0, 1, 0), z_dir=(0, 0, -1))) as fillet4_piece_26a_section:
        with BuildLine():
            CenterArc((FILLET4_R, -FILLET4_R), FILLET4_R, 90, 90)
            Line((0, -FILLET4_R), (0, 0))
            Line((0, 0), (FILLET4_R, 0))
        make_face()
    fillet4_piece_26a = extrude(amount=6.5, mode=Mode.PRIVATE)
    fillet4_piece_26a = split(fillet4_piece_26a, bisect_by=Plane(origin=(9.773604886, 12.226395114, 5), z_dir=(0, 0, -1)), keep=Keep.TOP, mode=Mode.PRIVATE)
    with BuildSketch(Plane(origin=(10, 8, 5), x_dir=(0, 0, -1), z_dir=(0, 1, 0))) as fillet4_piece_26b_section:
        with BuildLine():
            CenterArc((FILLET4_R, FILLET4_R), FILLET4_R, 180, 90)
            Line((0, FILLET4_R), (0, 0))
            Line((0, 0), (FILLET4_R, 0))
        make_face()
    fillet4_piece_26b = extrude(amount=6.5, mode=Mode.PRIVATE)
    fillet4_piece_26b = split(fillet4_piece_26b, bisect_by=Plane(origin=(9.773604886, 12, 4.773604886), z_dir=(0, 1, 0)), keep=Keep.TOP, mode=Mode.PRIVATE)
    fillet4_piece_26 = fillet4_piece_26a & fillet4_piece_26b
    add(fillet4_piece_26, mode=Mode.SUBTRACT)
    with BuildSketch(Plane(origin=(2.5, 8, 10), x_dir=(0, -1, 0), z_dir=(1, 0, 0))) as fillet4_piece_27a_section:
        with BuildLine():
            CenterArc((FILLET4_R, FILLET4_R), FILLET4_R, 180, 90)
            Line((0, FILLET4_R), (0, 0))
            Line((0, 0), (FILLET4_R, 0))
        make_face()
    fillet4_piece_27a = extrude(amount=6.5, mode=Mode.PRIVATE)
    fillet4_piece_27a = split(fillet4_piece_27a, bisect_by=Plane(origin=(5, 7.773604886, 9.773604886), z_dir=(-1, 0, 0)), keep=Keep.TOP, mode=Mode.PRIVATE)
    with BuildSketch(Plane(origin=(5, 12, 10), x_dir=(-1, 0, 0), z_dir=(0, -1, 0))) as fillet4_piece_27b_section:
        with BuildLine():
            CenterArc((FILLET4_R, FILLET4_R), FILLET4_R, 180, 90)
            Line((0, FILLET4_R), (0, 0))
            Line((0, 0), (FILLET4_R, 0))
        make_face()
    fillet4_piece_27b = extrude(amount=6.5, mode=Mode.PRIVATE)
    fillet4_piece_27b = split(fillet4_piece_27b, bisect_by=Plane(origin=(4.773604886, 8, 9.773604886), z_dir=(0, -1, 0)), keep=Keep.TOP, mode=Mode.PRIVATE)
    fillet4_piece_27 = fillet4_piece_27a & fillet4_piece_27b
    add(fillet4_piece_27, mode=Mode.SUBTRACT)
    with BuildSketch(Plane(origin=(-4.5, 20, 5), x_dir=(0, 0, -1), z_dir=(1, 0, 0))) as fillet4_piece_28a_section:
        with BuildLine():
            CenterArc((FILLET4_R, -FILLET4_R), FILLET4_R, 90, 90)
            Line((0, -FILLET4_R), (0, 0))
            Line((0, 0), (FILLET4_R, 0))
        make_face()
    fillet4_piece_28a = extrude(amount=6.5, mode=Mode.PRIVATE)
    fillet4_piece_28a = split(fillet4_piece_28a, bisect_by=Plane(origin=(-2, 19.773604886, 4.773604886), z_dir=(-1, 0, 0)), keep=Keep.TOP, mode=Mode.PRIVATE)
    with BuildSketch(Plane(origin=(-2, 20, 2.5), x_dir=(-1, 0, 0), z_dir=(0, 0, 1))) as fillet4_piece_28b_section:
        with BuildLine():
            CenterArc((FILLET4_R, FILLET4_R), FILLET4_R, 180, 90)
            Line((0, FILLET4_R), (0, 0))
            Line((0, 0), (FILLET4_R, 0))
        make_face()
    fillet4_piece_28b = extrude(amount=6.5, mode=Mode.PRIVATE)
    fillet4_piece_28b = split(fillet4_piece_28b, bisect_by=Plane(origin=(-2.226395114, 19.773604886, 5), z_dir=(0, 0, -1)), keep=Keep.TOP, mode=Mode.PRIVATE)
    fillet4_piece_28 = fillet4_piece_28a & fillet4_piece_28b
    add(fillet4_piece_28, mode=Mode.SUBTRACT)
    with BuildSketch(Plane(origin=(2, 20, 9), x_dir=(1, 0, 0), z_dir=(0, 0, -1))) as fillet4_piece_29a_section:
        with BuildLine():
            CenterArc((FILLET4_R, FILLET4_R), FILLET4_R, 180, 90)
            Line((0, FILLET4_R), (0, 0))
            Line((0, 0), (FILLET4_R, 0))
        make_face()
    fillet4_piece_29a = extrude(amount=6.5, mode=Mode.PRIVATE)
    fillet4_piece_29a = split(fillet4_piece_29a, bisect_by=Plane(origin=(2.226395114, 19.773604886, 5), z_dir=(0, 0, -1)), keep=Keep.TOP, mode=Mode.PRIVATE)
    with BuildSketch(Plane(origin=(-2, 20, 5), x_dir=(0, 0, -1), z_dir=(1, 0, 0))) as fillet4_piece_29b_section:
        with BuildLine():
            CenterArc((FILLET4_R, -FILLET4_R), FILLET4_R, 90, 90)
            Line((0, -FILLET4_R), (0, 0))
            Line((0, 0), (FILLET4_R, 0))
        make_face()
    fillet4_piece_29b = extrude(amount=6.5, mode=Mode.PRIVATE)
    fillet4_piece_29b = split(fillet4_piece_29b, bisect_by=Plane(origin=(2, 19.773604886, 4.773604886), z_dir=(1, 0, 0)), keep=Keep.TOP, mode=Mode.PRIVATE)
    fillet4_piece_29 = fillet4_piece_29a & fillet4_piece_29b
    add(fillet4_piece_29, mode=Mode.SUBTRACT)
    with BuildSketch(Plane(origin=(-4.5, 15, 10), x_dir=(0, -1, 0), z_dir=(1, 0, 0))) as fillet4_piece_30a_section:
        with BuildLine():
            CenterArc((FILLET4_R, FILLET4_R), FILLET4_R, 180, 90)
            Line((0, FILLET4_R), (0, 0))
            Line((0, 0), (FILLET4_R, 0))
        make_face()
    fillet4_piece_30a = extrude(amount=6.5, mode=Mode.PRIVATE)
    fillet4_piece_30a = split(fillet4_piece_30a, bisect_by=Plane(origin=(-2, 14.773604886, 9.773604886), z_dir=(-1, 0, 0)), keep=Keep.TOP, mode=Mode.PRIVATE)
    with BuildSketch(Plane(origin=(-2, 19, 10), x_dir=(-1, 0, 0), z_dir=(0, -1, 0))) as fillet4_piece_30b_section:
        with BuildLine():
            CenterArc((FILLET4_R, FILLET4_R), FILLET4_R, 180, 90)
            Line((0, FILLET4_R), (0, 0))
            Line((0, 0), (FILLET4_R, 0))
        make_face()
    fillet4_piece_30b = extrude(amount=6.5, mode=Mode.PRIVATE)
    fillet4_piece_30b = split(fillet4_piece_30b, bisect_by=Plane(origin=(-2.226395114, 15, 9.773604886), z_dir=(0, -1, 0)), keep=Keep.TOP, mode=Mode.PRIVATE)
    fillet4_piece_30 = fillet4_piece_30a & fillet4_piece_30b
    add(fillet4_piece_30, mode=Mode.SUBTRACT)
    with BuildSketch(Plane(origin=(2, 12.5, 10), x_dir=(1, 0, 0), z_dir=(0, 1, 0))) as fillet4_piece_31a_section:
        with BuildLine():
            CenterArc((FILLET4_R, FILLET4_R), FILLET4_R, 180, 90)
            Line((0, FILLET4_R), (0, 0))
            Line((0, 0), (FILLET4_R, 0))
        make_face()
    fillet4_piece_31a = extrude(amount=6.5, mode=Mode.PRIVATE)
    fillet4_piece_31a = split(fillet4_piece_31a, bisect_by=Plane(origin=(2.226395114, 15, 9.773604886), z_dir=(0, -1, 0)), keep=Keep.TOP, mode=Mode.PRIVATE)
    with BuildSketch(Plane(origin=(-2, 15, 10), x_dir=(0, -1, 0), z_dir=(1, 0, 0))) as fillet4_piece_31b_section:
        with BuildLine():
            CenterArc((FILLET4_R, FILLET4_R), FILLET4_R, 180, 90)
            Line((0, FILLET4_R), (0, 0))
            Line((0, 0), (FILLET4_R, 0))
        make_face()
    fillet4_piece_31b = extrude(amount=6.5, mode=Mode.PRIVATE)
    fillet4_piece_31b = split(fillet4_piece_31b, bisect_by=Plane(origin=(2, 14.773604886, 9.773604886), z_dir=(1, 0, 0)), keep=Keep.TOP, mode=Mode.PRIVATE)
    fillet4_piece_31 = fillet4_piece_31a & fillet4_piece_31b
    add(fillet4_piece_31, mode=Mode.SUBTRACT)
    with BuildSketch(Plane(origin=(9, 20, -2), x_dir=(0, 0, -1), z_dir=(-1, 0, 0))) as fillet4_piece_32a_section:
        with BuildLine():
            CenterArc((FILLET4_R, FILLET4_R), FILLET4_R, 180, 90)
            Line((0, FILLET4_R), (0, 0))
            Line((0, 0), (FILLET4_R, 0))
        make_face()
    fillet4_piece_32a = extrude(amount=6.5, mode=Mode.PRIVATE)
    fillet4_piece_32a = split(fillet4_piece_32a, bisect_by=Plane(origin=(5, 19.773604886, -2.226395114), z_dir=(-1, 0, 0)), keep=Keep.TOP, mode=Mode.PRIVATE)
    with BuildSketch(Plane(origin=(5, 20, -4.5), x_dir=(-1, 0, 0), z_dir=(0, 0, 1))) as fillet4_piece_32b_section:
        with BuildLine():
            CenterArc((FILLET4_R, FILLET4_R), FILLET4_R, 180, 90)
            Line((0, FILLET4_R), (0, 0))
            Line((0, 0), (FILLET4_R, 0))
        make_face()
    fillet4_piece_32b = extrude(amount=6.5, mode=Mode.PRIVATE)
    fillet4_piece_32b = split(fillet4_piece_32b, bisect_by=Plane(origin=(4.773604886, 19.773604886, -2), z_dir=(0, 0, -1)), keep=Keep.TOP, mode=Mode.PRIVATE)
    fillet4_piece_32 = fillet4_piece_32a & fillet4_piece_32b
    add(fillet4_piece_32, mode=Mode.SUBTRACT)
    with BuildSketch(Plane(origin=(10, 15, 4.5), x_dir=(0, -1, 0), z_dir=(0, 0, -1))) as fillet4_piece_33a_section:
        with BuildLine():
            CenterArc((FILLET4_R, FILLET4_R), FILLET4_R, 180, 90)
            Line((0, FILLET4_R), (0, 0))
            Line((0, 0), (FILLET4_R, 0))
        make_face()
    fillet4_piece_33a = extrude(amount=6.5, mode=Mode.PRIVATE)
    fillet4_piece_33a = split(fillet4_piece_33a, bisect_by=Plane(origin=(9.773604886, 14.773604886, 2), z_dir=(0, 0, 1)), keep=Keep.TOP, mode=Mode.PRIVATE)
    with BuildSketch(Plane(origin=(10, 12.5, 2), x_dir=(0, 0, 1), z_dir=(0, 1, 0))) as fillet4_piece_33b_section:
        with BuildLine():
            CenterArc((FILLET4_R, -FILLET4_R), FILLET4_R, 90, 90)
            Line((0, -FILLET4_R), (0, 0))
            Line((0, 0), (FILLET4_R, 0))
        make_face()
    fillet4_piece_33b = extrude(amount=6.5, mode=Mode.PRIVATE)
    fillet4_piece_33b = split(fillet4_piece_33b, bisect_by=Plane(origin=(9.773604886, 15, 2.226395114), z_dir=(0, -1, 0)), keep=Keep.TOP, mode=Mode.PRIVATE)
    fillet4_piece_33 = fillet4_piece_33a & fillet4_piece_33b
    add(fillet4_piece_33, mode=Mode.SUBTRACT)
    with BuildSketch(Plane(origin=(10, 19, -2), x_dir=(0, 0, -1), z_dir=(0, -1, 0))) as fillet4_piece_34a_section:
        with BuildLine():
            CenterArc((FILLET4_R, -FILLET4_R), FILLET4_R, 90, 90)
            Line((0, -FILLET4_R), (0, 0))
            Line((0, 0), (FILLET4_R, 0))
        make_face()
    fillet4_piece_34a = extrude(amount=6.5, mode=Mode.PRIVATE)
    fillet4_piece_34a = split(fillet4_piece_34a, bisect_by=Plane(origin=(9.773604886, 15, -2.226395114), z_dir=(0, -1, 0)), keep=Keep.TOP, mode=Mode.PRIVATE)
    with BuildSketch(Plane(origin=(10, 15, 2), x_dir=(0, -1, 0), z_dir=(0, 0, -1))) as fillet4_piece_34b_section:
        with BuildLine():
            CenterArc((FILLET4_R, FILLET4_R), FILLET4_R, 180, 90)
            Line((0, FILLET4_R), (0, 0))
            Line((0, 0), (FILLET4_R, 0))
        make_face()
    fillet4_piece_34b = extrude(amount=6.5, mode=Mode.PRIVATE)
    fillet4_piece_34b = split(fillet4_piece_34b, bisect_by=Plane(origin=(9.773604886, 14.773604886, -2), z_dir=(0, 0, -1)), keep=Keep.TOP, mode=Mode.PRIVATE)
    fillet4_piece_34 = fillet4_piece_34a & fillet4_piece_34b
    add(fillet4_piece_34, mode=Mode.SUBTRACT)
    with BuildSketch(Plane(origin=(5, 20, -2), x_dir=(-1, 0, 0), z_dir=(0, 0, 1))) as fillet4_piece_35a_section:
        with BuildLine():
            CenterArc((FILLET4_R, FILLET4_R), FILLET4_R, 180, 90)
            Line((0, FILLET4_R), (0, 0))
            Line((0, 0), (FILLET4_R, 0))
        make_face()
    fillet4_piece_35a = extrude(amount=6.5, mode=Mode.PRIVATE)
    fillet4_piece_35a = split(fillet4_piece_35a, bisect_by=Plane(origin=(4.773604886, 19.773604886, 2), z_dir=(0, 0, 1)), keep=Keep.TOP, mode=Mode.PRIVATE)
    with BuildSketch(Plane(origin=(2.5, 20, 2), x_dir=(0, 0, 1), z_dir=(1, 0, 0))) as fillet4_piece_35b_section:
        with BuildLine():
            CenterArc((FILLET4_R, FILLET4_R), FILLET4_R, 180, 90)
            Line((0, FILLET4_R), (0, 0))
            Line((0, 0), (FILLET4_R, 0))
        make_face()
    fillet4_piece_35b = extrude(amount=6.5, mode=Mode.PRIVATE)
    fillet4_piece_35b = split(fillet4_piece_35b, bisect_by=Plane(origin=(5, 19.773604886, 2.226395114), z_dir=(-1, 0, 0)), keep=Keep.TOP, mode=Mode.PRIVATE)
    fillet4_piece_35 = fillet4_piece_35a & fillet4_piece_35b
    add(fillet4_piece_35, mode=Mode.SUBTRACT)


solid = part.part
